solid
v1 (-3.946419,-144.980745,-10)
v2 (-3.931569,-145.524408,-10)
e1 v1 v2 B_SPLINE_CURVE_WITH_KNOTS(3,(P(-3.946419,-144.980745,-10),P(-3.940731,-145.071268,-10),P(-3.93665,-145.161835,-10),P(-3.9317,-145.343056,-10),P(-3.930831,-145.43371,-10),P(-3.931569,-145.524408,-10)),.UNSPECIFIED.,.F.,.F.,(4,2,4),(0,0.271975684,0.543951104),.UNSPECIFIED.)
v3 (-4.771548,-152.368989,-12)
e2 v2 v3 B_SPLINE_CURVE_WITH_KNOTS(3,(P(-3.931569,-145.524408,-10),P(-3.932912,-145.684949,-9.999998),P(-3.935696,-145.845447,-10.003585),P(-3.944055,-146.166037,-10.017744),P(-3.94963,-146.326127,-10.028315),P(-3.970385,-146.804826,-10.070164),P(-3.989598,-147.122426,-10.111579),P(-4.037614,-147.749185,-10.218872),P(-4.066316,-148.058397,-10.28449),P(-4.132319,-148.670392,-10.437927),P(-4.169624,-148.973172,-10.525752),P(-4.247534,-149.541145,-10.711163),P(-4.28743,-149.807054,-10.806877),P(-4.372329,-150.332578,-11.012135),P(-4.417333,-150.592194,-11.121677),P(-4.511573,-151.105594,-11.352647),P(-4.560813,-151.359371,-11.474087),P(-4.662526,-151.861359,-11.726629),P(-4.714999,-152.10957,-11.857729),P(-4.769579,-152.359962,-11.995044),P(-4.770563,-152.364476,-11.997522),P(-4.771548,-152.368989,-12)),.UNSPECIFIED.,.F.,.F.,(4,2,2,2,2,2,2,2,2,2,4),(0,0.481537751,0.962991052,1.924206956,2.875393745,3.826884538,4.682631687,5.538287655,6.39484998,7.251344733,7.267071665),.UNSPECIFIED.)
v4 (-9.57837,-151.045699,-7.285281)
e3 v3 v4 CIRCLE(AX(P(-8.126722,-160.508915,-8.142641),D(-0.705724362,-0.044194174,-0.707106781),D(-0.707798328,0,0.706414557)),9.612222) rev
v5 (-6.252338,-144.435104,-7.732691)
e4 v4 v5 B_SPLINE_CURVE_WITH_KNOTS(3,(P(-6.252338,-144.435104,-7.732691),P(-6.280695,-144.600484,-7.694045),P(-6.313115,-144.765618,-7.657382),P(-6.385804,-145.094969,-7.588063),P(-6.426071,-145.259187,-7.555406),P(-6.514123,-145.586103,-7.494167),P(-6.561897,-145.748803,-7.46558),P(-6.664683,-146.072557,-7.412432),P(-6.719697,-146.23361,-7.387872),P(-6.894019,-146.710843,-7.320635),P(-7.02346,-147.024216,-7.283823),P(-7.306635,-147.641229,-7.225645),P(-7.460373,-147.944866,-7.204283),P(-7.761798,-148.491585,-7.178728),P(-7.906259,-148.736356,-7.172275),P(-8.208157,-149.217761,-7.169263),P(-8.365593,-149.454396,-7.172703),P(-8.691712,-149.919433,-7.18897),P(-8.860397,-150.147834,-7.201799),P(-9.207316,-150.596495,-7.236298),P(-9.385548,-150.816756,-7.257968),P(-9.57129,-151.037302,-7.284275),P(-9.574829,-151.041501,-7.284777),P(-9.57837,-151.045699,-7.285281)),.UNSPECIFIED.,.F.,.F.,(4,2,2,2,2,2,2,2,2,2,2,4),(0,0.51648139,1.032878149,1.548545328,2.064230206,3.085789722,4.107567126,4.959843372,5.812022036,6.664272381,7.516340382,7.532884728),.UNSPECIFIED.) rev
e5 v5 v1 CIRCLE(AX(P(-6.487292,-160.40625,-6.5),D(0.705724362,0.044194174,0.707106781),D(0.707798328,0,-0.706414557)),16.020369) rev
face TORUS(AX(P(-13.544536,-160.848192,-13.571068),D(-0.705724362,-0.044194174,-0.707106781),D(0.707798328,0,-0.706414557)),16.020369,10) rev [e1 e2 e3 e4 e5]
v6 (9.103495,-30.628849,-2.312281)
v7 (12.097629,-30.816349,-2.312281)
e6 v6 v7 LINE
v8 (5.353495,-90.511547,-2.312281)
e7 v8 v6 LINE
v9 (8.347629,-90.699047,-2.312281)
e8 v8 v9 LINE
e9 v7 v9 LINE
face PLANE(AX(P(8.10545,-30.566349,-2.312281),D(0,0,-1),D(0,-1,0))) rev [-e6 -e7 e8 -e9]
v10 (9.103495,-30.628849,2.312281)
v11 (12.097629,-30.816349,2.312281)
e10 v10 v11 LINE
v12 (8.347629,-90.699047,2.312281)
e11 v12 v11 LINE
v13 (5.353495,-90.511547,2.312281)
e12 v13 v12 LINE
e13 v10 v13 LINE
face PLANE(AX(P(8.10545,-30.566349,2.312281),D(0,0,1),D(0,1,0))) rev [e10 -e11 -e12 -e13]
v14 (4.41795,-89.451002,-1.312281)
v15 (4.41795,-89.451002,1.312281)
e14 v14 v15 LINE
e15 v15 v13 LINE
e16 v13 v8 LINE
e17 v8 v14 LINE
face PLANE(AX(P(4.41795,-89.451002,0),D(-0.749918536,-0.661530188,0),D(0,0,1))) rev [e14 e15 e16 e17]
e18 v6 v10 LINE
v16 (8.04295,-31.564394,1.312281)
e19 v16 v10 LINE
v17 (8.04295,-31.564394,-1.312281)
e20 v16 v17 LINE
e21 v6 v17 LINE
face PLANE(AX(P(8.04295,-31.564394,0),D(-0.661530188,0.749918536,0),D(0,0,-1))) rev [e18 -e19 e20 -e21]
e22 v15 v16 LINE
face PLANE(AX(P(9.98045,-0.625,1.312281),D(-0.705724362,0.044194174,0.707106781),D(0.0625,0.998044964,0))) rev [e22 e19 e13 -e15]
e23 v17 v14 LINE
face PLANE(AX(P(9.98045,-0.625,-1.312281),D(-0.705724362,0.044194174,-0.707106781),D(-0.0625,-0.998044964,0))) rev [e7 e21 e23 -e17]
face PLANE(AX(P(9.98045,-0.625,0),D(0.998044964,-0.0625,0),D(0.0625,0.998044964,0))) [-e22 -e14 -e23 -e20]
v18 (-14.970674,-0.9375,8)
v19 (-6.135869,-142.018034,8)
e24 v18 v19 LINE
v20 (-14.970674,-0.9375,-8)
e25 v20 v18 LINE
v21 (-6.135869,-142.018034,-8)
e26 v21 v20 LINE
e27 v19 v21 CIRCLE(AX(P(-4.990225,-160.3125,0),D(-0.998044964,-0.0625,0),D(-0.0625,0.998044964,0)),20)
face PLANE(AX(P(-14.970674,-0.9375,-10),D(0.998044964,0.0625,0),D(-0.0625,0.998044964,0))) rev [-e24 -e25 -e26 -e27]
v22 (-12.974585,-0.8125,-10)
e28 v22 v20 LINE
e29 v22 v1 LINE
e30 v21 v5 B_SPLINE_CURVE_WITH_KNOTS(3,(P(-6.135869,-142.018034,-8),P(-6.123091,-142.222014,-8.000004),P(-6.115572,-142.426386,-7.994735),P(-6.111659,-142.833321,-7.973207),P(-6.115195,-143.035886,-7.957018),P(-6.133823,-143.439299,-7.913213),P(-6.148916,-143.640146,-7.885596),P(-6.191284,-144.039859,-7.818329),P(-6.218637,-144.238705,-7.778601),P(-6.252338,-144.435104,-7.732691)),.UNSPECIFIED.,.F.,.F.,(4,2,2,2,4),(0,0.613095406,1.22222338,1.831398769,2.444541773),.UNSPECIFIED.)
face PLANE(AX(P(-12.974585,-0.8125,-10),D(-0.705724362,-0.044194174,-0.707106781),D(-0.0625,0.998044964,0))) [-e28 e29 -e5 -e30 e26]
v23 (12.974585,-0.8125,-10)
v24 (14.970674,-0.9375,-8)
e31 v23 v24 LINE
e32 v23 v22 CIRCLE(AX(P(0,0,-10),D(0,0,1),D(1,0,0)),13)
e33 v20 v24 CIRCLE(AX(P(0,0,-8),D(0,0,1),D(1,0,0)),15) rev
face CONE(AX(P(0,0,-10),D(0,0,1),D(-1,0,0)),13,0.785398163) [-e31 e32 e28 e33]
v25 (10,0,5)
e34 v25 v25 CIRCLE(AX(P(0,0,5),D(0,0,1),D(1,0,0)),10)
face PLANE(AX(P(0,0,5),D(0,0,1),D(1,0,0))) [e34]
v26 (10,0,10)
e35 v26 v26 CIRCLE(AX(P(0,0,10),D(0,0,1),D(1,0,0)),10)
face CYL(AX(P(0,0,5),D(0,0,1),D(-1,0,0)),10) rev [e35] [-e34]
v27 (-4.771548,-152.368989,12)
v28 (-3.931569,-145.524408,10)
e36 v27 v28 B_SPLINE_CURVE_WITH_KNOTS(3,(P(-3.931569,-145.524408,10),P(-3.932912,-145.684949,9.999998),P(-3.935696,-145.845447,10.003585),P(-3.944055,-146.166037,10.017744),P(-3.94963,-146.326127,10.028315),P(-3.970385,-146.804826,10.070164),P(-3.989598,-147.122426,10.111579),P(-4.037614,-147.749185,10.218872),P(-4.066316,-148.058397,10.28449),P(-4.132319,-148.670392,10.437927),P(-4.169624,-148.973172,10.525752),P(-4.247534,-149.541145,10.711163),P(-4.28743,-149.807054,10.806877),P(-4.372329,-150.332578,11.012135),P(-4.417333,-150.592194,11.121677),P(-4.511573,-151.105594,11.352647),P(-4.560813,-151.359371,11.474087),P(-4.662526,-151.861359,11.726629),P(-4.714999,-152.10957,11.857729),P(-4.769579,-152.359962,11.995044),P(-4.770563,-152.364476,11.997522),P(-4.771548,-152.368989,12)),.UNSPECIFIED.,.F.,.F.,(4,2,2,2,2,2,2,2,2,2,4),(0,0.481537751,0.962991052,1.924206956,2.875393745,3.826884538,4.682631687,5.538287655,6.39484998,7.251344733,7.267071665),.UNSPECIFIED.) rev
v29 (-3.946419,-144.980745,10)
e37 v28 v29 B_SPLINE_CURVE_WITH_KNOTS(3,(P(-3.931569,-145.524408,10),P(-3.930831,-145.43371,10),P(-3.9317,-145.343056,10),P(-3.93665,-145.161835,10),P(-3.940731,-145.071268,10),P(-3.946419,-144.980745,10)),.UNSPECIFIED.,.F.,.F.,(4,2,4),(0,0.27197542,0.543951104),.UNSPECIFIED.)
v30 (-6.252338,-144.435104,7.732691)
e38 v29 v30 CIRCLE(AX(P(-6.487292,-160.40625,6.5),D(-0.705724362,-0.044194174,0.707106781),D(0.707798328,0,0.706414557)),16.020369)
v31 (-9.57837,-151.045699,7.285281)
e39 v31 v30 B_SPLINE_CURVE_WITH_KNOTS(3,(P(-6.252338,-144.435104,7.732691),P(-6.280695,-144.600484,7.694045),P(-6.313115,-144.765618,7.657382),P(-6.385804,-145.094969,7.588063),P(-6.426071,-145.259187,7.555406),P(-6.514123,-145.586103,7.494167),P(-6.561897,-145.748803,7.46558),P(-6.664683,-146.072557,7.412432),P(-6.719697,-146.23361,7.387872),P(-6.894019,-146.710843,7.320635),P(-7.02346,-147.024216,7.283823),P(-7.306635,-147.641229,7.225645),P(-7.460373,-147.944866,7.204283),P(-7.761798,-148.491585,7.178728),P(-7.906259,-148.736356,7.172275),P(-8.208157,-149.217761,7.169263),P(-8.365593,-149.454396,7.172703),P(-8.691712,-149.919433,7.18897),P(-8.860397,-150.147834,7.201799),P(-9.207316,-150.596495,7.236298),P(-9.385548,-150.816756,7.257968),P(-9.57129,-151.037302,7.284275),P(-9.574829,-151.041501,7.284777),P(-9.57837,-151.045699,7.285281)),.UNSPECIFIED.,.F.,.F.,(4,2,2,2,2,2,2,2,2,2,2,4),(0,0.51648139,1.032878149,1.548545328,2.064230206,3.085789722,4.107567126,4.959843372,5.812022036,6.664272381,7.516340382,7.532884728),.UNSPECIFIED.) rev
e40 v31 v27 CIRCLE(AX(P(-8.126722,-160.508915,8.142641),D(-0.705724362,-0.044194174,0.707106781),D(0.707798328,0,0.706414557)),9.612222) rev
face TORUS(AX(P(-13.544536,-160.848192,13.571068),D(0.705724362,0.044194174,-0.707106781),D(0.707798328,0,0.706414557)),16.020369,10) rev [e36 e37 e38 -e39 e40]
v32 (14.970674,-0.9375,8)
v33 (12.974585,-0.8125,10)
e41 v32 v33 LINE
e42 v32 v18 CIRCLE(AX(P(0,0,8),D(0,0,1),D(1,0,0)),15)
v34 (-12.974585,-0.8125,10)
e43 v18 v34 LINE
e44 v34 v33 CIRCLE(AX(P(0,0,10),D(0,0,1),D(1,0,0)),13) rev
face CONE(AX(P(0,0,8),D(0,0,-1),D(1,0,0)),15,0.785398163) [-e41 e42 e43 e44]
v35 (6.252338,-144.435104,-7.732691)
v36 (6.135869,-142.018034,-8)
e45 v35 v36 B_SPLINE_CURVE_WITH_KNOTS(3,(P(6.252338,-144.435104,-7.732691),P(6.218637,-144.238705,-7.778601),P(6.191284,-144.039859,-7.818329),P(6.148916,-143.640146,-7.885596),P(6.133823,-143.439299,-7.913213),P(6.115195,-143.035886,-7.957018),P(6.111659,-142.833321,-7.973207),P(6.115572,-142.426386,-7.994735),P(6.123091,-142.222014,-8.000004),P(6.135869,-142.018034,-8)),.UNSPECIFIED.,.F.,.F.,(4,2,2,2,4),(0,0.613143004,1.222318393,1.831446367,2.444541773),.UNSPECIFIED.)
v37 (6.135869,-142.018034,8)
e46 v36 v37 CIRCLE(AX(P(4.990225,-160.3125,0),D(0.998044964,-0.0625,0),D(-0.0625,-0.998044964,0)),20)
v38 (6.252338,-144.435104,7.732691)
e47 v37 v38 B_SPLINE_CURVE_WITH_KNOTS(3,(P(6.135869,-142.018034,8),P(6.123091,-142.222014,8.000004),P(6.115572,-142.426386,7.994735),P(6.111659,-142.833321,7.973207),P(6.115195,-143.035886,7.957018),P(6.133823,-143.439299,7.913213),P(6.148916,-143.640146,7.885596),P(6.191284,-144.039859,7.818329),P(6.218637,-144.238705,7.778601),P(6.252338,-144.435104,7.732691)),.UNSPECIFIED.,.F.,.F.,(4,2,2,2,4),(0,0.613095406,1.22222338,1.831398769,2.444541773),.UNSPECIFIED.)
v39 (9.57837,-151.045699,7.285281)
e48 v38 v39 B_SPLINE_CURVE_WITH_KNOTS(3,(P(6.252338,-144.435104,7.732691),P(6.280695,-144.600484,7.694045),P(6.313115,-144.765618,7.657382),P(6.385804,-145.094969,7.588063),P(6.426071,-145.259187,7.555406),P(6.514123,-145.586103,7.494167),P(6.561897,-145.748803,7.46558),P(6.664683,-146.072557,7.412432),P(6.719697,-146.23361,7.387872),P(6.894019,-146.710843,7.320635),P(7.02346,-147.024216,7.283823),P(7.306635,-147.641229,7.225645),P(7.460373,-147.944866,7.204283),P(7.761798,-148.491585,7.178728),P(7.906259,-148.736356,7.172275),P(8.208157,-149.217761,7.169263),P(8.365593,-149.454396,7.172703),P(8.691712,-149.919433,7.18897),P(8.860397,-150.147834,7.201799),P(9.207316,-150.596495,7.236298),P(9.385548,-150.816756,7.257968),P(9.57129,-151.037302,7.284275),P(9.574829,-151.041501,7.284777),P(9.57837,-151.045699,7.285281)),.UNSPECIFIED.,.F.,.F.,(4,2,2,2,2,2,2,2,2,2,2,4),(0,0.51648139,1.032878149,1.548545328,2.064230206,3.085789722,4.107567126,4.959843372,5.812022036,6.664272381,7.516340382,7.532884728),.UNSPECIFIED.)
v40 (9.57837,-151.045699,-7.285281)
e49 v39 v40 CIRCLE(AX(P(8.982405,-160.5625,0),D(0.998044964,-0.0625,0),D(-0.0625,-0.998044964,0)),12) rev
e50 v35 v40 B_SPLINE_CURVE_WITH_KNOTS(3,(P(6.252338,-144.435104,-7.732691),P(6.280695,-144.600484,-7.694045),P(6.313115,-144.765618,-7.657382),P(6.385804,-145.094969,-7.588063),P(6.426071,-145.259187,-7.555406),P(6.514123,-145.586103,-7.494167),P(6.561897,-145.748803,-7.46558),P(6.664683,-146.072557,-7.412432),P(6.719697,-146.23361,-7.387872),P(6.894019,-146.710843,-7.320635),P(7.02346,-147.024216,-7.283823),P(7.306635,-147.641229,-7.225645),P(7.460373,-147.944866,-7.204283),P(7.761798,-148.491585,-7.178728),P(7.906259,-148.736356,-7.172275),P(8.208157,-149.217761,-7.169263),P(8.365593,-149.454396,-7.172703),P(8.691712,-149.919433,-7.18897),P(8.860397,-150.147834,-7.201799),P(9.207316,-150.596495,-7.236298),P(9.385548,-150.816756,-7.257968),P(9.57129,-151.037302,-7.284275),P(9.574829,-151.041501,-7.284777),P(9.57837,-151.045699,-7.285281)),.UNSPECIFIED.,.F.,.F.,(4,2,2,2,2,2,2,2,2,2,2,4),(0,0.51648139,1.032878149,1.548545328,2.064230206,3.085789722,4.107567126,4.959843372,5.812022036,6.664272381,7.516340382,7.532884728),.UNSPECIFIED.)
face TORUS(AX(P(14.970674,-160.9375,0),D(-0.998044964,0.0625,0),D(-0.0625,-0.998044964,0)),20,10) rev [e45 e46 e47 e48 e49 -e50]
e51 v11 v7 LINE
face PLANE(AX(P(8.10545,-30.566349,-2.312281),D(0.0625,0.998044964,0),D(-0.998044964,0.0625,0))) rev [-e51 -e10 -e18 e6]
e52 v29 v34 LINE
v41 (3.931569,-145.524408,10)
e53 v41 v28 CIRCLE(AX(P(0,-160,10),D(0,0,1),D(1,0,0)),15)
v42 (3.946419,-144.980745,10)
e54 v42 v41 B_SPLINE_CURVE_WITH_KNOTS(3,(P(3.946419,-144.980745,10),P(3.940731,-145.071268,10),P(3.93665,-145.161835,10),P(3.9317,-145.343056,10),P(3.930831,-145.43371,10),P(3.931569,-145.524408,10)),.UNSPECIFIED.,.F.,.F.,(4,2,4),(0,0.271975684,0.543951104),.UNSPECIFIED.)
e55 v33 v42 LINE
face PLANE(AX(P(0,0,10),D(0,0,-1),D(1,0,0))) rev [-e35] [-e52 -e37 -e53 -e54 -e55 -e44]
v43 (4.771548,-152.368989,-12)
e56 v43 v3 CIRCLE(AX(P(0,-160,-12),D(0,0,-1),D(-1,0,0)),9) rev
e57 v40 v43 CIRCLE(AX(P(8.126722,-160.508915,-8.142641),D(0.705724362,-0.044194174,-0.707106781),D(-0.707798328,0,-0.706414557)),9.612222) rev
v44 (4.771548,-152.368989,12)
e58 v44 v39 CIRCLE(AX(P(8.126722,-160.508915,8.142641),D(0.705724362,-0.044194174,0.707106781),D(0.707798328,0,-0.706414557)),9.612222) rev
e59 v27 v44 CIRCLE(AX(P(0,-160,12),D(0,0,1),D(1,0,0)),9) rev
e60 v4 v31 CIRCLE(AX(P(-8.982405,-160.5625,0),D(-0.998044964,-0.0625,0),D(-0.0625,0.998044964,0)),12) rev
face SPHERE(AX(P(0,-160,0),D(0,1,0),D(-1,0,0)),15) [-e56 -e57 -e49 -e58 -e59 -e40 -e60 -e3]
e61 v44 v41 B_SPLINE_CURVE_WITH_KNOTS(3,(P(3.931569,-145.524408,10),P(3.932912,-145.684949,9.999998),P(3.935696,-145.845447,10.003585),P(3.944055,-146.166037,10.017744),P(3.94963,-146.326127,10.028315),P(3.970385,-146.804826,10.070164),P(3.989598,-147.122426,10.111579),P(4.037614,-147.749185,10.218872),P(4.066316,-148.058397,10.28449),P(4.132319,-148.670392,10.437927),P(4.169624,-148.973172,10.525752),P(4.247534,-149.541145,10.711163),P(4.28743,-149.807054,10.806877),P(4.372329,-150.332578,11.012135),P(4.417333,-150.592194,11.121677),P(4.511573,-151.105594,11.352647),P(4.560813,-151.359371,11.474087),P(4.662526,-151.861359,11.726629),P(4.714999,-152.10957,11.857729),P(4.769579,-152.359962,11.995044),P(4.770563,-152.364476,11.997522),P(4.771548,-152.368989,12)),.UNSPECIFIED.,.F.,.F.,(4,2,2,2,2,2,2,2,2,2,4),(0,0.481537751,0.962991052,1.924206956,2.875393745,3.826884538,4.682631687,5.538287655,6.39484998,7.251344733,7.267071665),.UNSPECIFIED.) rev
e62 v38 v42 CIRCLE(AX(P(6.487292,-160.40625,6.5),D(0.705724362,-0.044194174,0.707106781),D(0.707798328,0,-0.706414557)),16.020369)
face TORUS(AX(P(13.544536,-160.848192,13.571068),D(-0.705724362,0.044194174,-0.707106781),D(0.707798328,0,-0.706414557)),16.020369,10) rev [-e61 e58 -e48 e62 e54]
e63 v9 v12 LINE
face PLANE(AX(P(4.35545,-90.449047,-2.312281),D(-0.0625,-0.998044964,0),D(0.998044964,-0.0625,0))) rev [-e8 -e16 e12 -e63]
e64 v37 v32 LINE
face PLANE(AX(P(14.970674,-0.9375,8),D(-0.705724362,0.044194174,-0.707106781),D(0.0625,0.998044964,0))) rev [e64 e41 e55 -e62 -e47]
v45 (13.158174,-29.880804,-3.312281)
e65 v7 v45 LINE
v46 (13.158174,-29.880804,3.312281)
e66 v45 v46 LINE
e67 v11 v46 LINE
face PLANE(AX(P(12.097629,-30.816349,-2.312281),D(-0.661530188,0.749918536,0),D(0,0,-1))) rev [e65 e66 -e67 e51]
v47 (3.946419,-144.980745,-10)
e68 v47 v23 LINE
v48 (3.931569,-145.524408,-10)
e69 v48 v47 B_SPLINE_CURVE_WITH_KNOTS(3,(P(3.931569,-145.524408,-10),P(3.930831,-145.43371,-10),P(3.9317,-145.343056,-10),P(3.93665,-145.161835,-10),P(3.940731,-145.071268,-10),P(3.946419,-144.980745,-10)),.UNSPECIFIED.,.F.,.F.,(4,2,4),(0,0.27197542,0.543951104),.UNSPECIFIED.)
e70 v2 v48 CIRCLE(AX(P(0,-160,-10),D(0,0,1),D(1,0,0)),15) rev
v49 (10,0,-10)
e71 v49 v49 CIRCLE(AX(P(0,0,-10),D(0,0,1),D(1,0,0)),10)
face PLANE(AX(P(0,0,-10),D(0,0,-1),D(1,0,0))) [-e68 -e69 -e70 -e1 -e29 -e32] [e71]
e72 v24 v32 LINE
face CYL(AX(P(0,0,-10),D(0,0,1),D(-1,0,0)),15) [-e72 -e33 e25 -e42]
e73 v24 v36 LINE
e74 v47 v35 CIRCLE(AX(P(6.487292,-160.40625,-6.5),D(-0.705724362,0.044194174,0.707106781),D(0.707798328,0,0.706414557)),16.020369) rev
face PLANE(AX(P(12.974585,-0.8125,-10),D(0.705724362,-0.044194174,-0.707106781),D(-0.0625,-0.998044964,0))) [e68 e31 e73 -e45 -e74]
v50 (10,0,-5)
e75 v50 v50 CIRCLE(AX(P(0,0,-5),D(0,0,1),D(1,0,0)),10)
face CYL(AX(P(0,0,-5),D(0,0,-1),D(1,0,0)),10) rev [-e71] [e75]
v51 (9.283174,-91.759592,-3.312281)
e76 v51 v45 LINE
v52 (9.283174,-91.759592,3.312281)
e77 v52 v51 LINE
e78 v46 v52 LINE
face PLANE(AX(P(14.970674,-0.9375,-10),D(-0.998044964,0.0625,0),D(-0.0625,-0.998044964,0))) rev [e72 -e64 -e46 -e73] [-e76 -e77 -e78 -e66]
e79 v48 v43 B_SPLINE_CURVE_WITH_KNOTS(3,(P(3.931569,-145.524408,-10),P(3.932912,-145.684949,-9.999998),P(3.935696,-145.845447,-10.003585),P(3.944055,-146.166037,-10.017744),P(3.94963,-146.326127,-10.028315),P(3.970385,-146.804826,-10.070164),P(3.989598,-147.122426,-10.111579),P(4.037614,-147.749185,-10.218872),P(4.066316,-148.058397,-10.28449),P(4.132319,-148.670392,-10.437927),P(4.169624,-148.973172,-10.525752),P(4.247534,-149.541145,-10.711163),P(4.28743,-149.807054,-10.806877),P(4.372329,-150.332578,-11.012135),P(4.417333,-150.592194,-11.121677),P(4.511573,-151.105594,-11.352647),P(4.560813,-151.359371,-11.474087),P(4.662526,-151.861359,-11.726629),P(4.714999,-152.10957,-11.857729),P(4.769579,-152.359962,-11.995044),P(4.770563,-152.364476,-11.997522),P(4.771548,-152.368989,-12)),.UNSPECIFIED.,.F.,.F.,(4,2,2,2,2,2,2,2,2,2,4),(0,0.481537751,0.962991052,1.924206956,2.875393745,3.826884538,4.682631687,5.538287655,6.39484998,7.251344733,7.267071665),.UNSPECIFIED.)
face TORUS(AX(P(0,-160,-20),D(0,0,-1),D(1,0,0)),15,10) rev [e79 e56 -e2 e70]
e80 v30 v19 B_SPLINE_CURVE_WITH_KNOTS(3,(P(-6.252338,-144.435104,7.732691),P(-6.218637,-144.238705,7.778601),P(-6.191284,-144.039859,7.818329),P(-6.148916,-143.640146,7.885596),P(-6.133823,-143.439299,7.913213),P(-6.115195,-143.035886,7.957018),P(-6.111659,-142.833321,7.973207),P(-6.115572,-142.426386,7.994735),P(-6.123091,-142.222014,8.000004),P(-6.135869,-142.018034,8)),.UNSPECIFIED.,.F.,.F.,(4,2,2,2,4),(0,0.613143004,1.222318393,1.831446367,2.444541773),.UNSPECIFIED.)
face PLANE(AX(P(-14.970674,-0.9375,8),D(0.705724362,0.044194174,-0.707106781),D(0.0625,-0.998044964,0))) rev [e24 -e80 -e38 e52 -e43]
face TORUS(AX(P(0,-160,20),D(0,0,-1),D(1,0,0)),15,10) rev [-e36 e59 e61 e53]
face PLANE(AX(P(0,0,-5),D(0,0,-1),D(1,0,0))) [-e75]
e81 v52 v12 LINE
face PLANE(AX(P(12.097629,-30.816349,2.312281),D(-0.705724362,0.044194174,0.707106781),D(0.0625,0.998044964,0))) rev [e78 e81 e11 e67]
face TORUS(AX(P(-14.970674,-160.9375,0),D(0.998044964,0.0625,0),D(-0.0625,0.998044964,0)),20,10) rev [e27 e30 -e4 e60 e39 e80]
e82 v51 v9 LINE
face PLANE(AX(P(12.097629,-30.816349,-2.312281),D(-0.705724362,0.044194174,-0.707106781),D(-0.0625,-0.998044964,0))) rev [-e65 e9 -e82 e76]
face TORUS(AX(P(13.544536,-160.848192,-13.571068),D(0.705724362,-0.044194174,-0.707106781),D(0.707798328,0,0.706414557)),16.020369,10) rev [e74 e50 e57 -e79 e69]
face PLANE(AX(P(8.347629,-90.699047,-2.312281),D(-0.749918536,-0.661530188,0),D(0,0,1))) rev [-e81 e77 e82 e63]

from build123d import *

# Parameters (mm, degrees)
BOSS_EXTRUDE1_DEPTH = 10
SKETCH2_R           = 10
CUT_EXTRUDE1_DEPTH  = 5
CHAMFER1_SIZE       = 2
FILLET1_R           = 10
SKETCH5_W           = 4.624562382
SKETCH5_H           = 60
CUT_EXTRUDE2_DEPTH  = 5
CHAMFER2_SIZE       = 1


with BuildPart() as part:
    # Sketch1 → Boss-Extrude1 (new, symmetric)
    with BuildSketch(Plane.XY):
        with BuildLine():
            Line((-14.970674459, -0.9375), (-4.99022482, -160.3125))
            ThreePointArc((-4.99022482, -160.3125), (0, -165), (4.99022482, -160.3125))
            Line((4.99022482, -160.3125), (14.970674459, -0.9375))
            ThreePointArc((14.970674459, -0.9375), (0, 15), (-14.970674459, -0.9375))
        make_face()
    extrude(amount=BOSS_EXTRUDE1_DEPTH, both=True)

    # Sketch2 → Cut-Extrude1 (cut)
    with BuildSketch(Plane.XY.offset(10)):
        Circle(SKETCH2_R)
    cut_extrude1 = extrude(amount=-CUT_EXTRUDE1_DEPTH, mode=Mode.SUBTRACT)

    # Mirror1: Cut-Extrude1 across plane
    add(cut_extrude1.mirror(Plane.XY), mode=Mode.SUBTRACT)

    # Sketch4 → Revolve1 (revolve)
    with BuildSketch(Plane.XY):
        with BuildLine():
            Line((0, -145), (0, -175))
            ThreePointArc((0, -175), (-15, -160), (0, -145))
        make_face()
    revolve(axis=Axis((0, -145, 0), (0, -1, 0)))

    # Chamfer1
    chamfer1_edges = [part.edges().sort_by_distance(p)[0] for p in [
        (10.292949639, -75.63477518, -10),
        (10.292949639, -75.63477518, 10),
        (0, 15, 10),
        (-10.292949639, -75.63477518, -10),
        (0, 15, -10),
        (-10.292949639, -75.63477518, 10),
    ]]
    chamfer(chamfer1_edges, length=CHAMFER1_SIZE)

    # Fillet1
    # the kernel refuses this fillet: 10 mm, written as the material it adds along each edge
    with BuildSketch(Plane(origin=(-4.99022482, -160.3125, 0), x_dir=(-0.06250000000000007, 0.998044963916957, 0), z_dir=(0, 0, 1))) as fillet1_piece_1_section:
        with BuildLine():
            CenterArc((20, 10), FILLET1_R, 216.869897646, 53.130102354)
            ThreePointArc((12, 4), (13.223192267, 2.081467804), (14.142135624, 0))
            Line((14.142135624, 0), (20, 0))
        make_face()
    fillet1_piece_1 = revolve(axis=Axis((-4.99022482, -160.3125, 0), (-0.9980449639169571, -0.0625000000000001, 0)), revolution_arc=93.785115708, mode=Mode.PRIVATE)
    fillet1_piece_1 = split(fillet1_piece_1, bisect_by=Plane(origin=(-8.411420692, -145.815593995, -5.491549314), z_dir=(0.7057243619147634, 0.04419417382415924, 0.7071067811865476)), keep=Keep.TOP, mode=Mode.PRIVATE)
    add(fillet1_piece_1)
    with BuildSketch(Plane(origin=(0, -160, -10), x_dir=(0.9277589286511917, 0.3731800775872058, 0), z_dir=(0.3731800775872058, -0.9277589286511917, 0))) as fillet1_piece_2_section:
        with BuildLine():
            CenterArc((15, -10), FILLET1_R, 90, 36.869897646)
            Line((15, 0), (11.180339887, 0))
            ThreePointArc((11.180339887, 0), (10.139602038, -1.053889384), (9, -2))
        make_face()
    fillet1_piece_2 = revolve(axis=Axis((0, -160, -10), (0, 0, 1)), revolution_arc=136.176249713, mode=Mode.PRIVATE)
    fillet1_piece_2 = split(fillet1_piece_2, bisect_by=Plane(origin=(-1.711528803, -148.391440275, -12.017352281), z_dir=(0.7057243619147634, 0.04419417382415924, 0.7071067811865476)), keep=Keep.TOP, mode=Mode.PRIVATE)
    fillet1_piece_2 = split(fillet1_piece_2, bisect_by=Plane(origin=(1.711528818, -148.391440274, -12.017352265), z_dir=(-0.7057243619147635, 0.04419417382415914, 0.7071067811865476)), keep=Keep.TOP, mode=Mode.PRIVATE)
    add(fillet1_piece_2)
    with BuildSketch(Plane(origin=(4.99022482, -160.3125, 0), x_dir=(-0.00413731999969642, -0.06606770223695776, -0.9978065650737866), z_dir=(-0.06236291031711149, -0.9958558172351702, 0.0661971199951418))) as fillet1_piece_3_section:
        with BuildLine():
            CenterArc((20, 10), FILLET1_R, 216.869897646, 53.130102354)
            Line((20, 0), (14.142135624, 0))
            ThreePointArc((14.142135624, 0), (13.223192267, 2.081467804), (12, 4))
        make_face()
    fillet1_piece_3 = revolve(axis=Axis((4.99022482, -160.3125, 0), (0.9980449639169571, -0.062499999999999827, 0)), revolution_arc=187.591182269, mode=Mode.PRIVATE)
    fillet1_piece_3 = split(fillet1_piece_3, bisect_by=Plane(origin=(10.264400578, -145.931631918, -3.6349397), z_dir=(-0.7057243619147635, 0.04419417382415914, 0.7071067811865476)), keep=Keep.TOP, mode=Mode.PRIVATE)
    fillet1_piece_3 = split(fillet1_piece_3, bisect_by=Plane(origin=(10.264400578, -145.931631918, 3.6349397), z_dir=(-0.7057243619147635, 0.04419417382415914, -0.7071067811865476)), keep=Keep.TOP, mode=Mode.PRIVATE)
    add(fillet1_piece_3)
    with BuildSketch(Plane(origin=(0, -160, 10), x_dir=(0.927758928651164, 0.3731800775872745, 0), z_dir=(0.3731800775872745, -0.927758928651164, 0))) as fillet1_piece_4_section:
        with BuildLine():
            CenterArc((15, 10), FILLET1_R, 233.130102354, 36.869897646)
            Line((15, 0), (11.180339887, 0))
            ThreePointArc((11.180339887, 0), (10.139602038, 1.053889384), (9, 2))
        make_face()
    fillet1_piece_4 = revolve(axis=Axis((0, -160, 10), (0, 0, 1)), revolution_arc=136.176249714, mode=Mode.PRIVATE)
    fillet1_piece_4 = split(fillet1_piece_4, bisect_by=Plane(origin=(-1.711528803, -148.391440275, 12.017352281), z_dir=(0.7057243619147634, 0.04419417382415924, -0.7071067811865476)), keep=Keep.TOP, mode=Mode.PRIVATE)
    fillet1_piece_4 = split(fillet1_piece_4, bisect_by=Plane(origin=(1.711528818, -148.391440274, 12.017352265), z_dir=(-0.7057243619147635, 0.04419417382415914, -0.7071067811865476)), keep=Keep.TOP, mode=Mode.PRIVATE)
    add(fillet1_piece_4)
    with BuildSketch(Plane(origin=(-6.487292265, -160.40625, -6.5), x_dir=(0.6656688251347166, 0.30034358438284603, -0.6831388925861491), z_dir=(0.24256574416798043, -0.9528066993467584, -0.1825411006764494))) as fillet1_piece_5_section:
        with BuildLine():
            CenterArc((16.020369437, -10), FILLET1_R, 90, 39.852602267)
            ThreePointArc((9.612221662, -2.323044738), (10.795413975, -1.221978705), (11.853269591, 0))
            Line((11.853269591, 0), (16.020369437, 0))
        make_face()
    fillet1_piece_5 = revolve(axis=Axis((-6.487292265, -160.40625, -6.5), (0.7057243619147634, 0.04419417382415923, 0.7071067811865476)), revolution_arc=115.087423951, mode=Mode.PRIVATE)
    fillet1_piece_5 = split(fillet1_piece_5, bisect_by=Plane(origin=(-5.569597037, -151.060667617, -10.379630778), z_dir=(-0.9980449639169571, -0.0625000000000001, 0)), keep=Keep.TOP, mode=Mode.PRIVATE)
    fillet1_piece_5 = split(fillet1_piece_5, bisect_by=Plane(origin=(-5.941894243, -151.083981773, -10), z_dir=(0, 0, -1)), keep=Keep.TOP, mode=Mode.PRIVATE)
    add(fillet1_piece_5)
    with BuildSketch(Plane(origin=(-6.487292265, -160.40625, -6.5), x_dir=(0.6656688251347166, 0.30034358438284603, -0.6831388925861491), z_dir=(0.24256574416798043, -0.9528066993467584, -0.1825411006764494))) as fillet1_piece_6_section:
        with BuildLine():
            CenterArc((16.020369437, -10), FILLET1_R, 90, 39.852602267)
            ThreePointArc((9.612221662, -2.323044738), (10.795413975, -1.221978705), (11.853269591, 0))
            Line((11.853269591, 0), (16.020369437, 0))
        make_face()
    fillet1_piece_6 = revolve(axis=Axis((-6.487292265, -160.40625, -6.5), (0.7057243619147634, 0.04419417382415923, 0.7071067811865476)), revolution_arc=115.087423951, mode=Mode.PRIVATE)
    fillet1_piece_6 = split(fillet1_piece_6, bisect_by=Plane(origin=(-5.772117496, -147.826675231, -9.126693525), z_dir=(0.9980449639169571, 0.0625000000000001, 0)), keep=Keep.TOP, mode=Mode.PRIVATE)
    fillet1_piece_6 = split(fillet1_piece_6, bisect_by=Plane(origin=(-4.883304062, -147.771015575, -10), z_dir=(0, 0, 1)), keep=Keep.TOP, mode=Mode.PRIVATE)
    add(fillet1_piece_6)
    with BuildSketch(Plane(origin=(6.487292265, -160.40625, -6.5), x_dir=(-0.6656688251347197, 0.30034358438283354, -0.6831388925861517), z_dir=(-0.2425657441679716, -0.9528066993467625, -0.18254110067644053))) as fillet1_piece_7_section:
        with BuildLine():
            CenterArc((16.020369437, 10), FILLET1_R, 230.147397733, 39.852602267)
            Line((16.020369437, 0), (11.853269591, 0))
            ThreePointArc((11.853269591, 0), (10.795413975, 1.221978705), (9.612221662, 2.323044738))
        make_face()
    fillet1_piece_7 = revolve(axis=Axis((6.487292265, -160.40625, -6.5), (0.7057243619147635, -0.04419417382415914, -0.7071067811865476)), revolution_arc=115.087423951, mode=Mode.PRIVATE)
    fillet1_piece_7 = split(fillet1_piece_7, bisect_by=Plane(origin=(5.772117495, -147.826675244, -9.126693294), z_dir=(-0.9980449639169571, 0.062499999999999827, 0)), keep=Keep.TOP, mode=Mode.PRIVATE)
    fillet1_piece_7 = split(fillet1_piece_7, bisect_by=Plane(origin=(4.883304233, -147.771015598, -10), z_dir=(0, 0, 1)), keep=Keep.TOP, mode=Mode.PRIVATE)
    add(fillet1_piece_7)
    with BuildSketch(Plane(origin=(6.487292265, -160.40625, -6.5), x_dir=(-0.6656688251347197, 0.30034358438283354, -0.6831388925861517), z_dir=(-0.2425657441679716, -0.9528066993467625, -0.18254110067644053))) as fillet1_piece_8_section:
        with BuildLine():
            CenterArc((16.020369437, 10), FILLET1_R, 230.147397733, 39.852602267)
            Line((16.020369437, 0), (11.853269591, 0))
            ThreePointArc((11.853269591, 0), (10.795413975, 1.221978705), (9.612221662, 2.323044738))
        make_face()
    fillet1_piece_8 = revolve(axis=Axis((6.487292265, -160.40625, -6.5), (0.7057243619147635, -0.04419417382415914, -0.7071067811865476)), revolution_arc=115.087423951, mode=Mode.PRIVATE)
    fillet1_piece_8 = split(fillet1_piece_8, bisect_by=Plane(origin=(5.569597038, -151.060667609, -10.379630783), z_dir=(0.9980449639169571, -0.062499999999999827, 0)), keep=Keep.TOP, mode=Mode.PRIVATE)
    fillet1_piece_8 = split(fillet1_piece_8, bisect_by=Plane(origin=(5.941894234, -151.083981764, -10), z_dir=(0, 0, -1)), keep=Keep.TOP, mode=Mode.PRIVATE)
    add(fillet1_piece_8)
    with BuildSketch(Plane(origin=(-6.487292265, -160.40625, 6.5), x_dir=(0.6656688251347166, 0.3003435843828461, 0.6831388925861492), z_dir=(0.24256574416798046, -0.9528066993467585, 0.18254110067644944))) as fillet1_piece_9_section:
        with BuildLine():
            CenterArc((16.020369437, 10), FILLET1_R, 230.147397733, 39.852602267)
            ThreePointArc((9.612221662, 2.323044738), (10.795413975, 1.221978705), (11.853269591, 0))
            Line((11.853269591, 0), (16.020369437, 0))
        make_face()
    fillet1_piece_9 = revolve(axis=Axis((-6.487292265, -160.40625, 6.5), (-0.7057243619147634, -0.04419417382415923, 0.7071067811865476)), revolution_arc=115.087423951, mode=Mode.PRIVATE)
    fillet1_piece_9 = split(fillet1_piece_9, bisect_by=Plane(origin=(-5.569597037, -151.060667617, 10.379630778), z_dir=(-0.9980449639169571, -0.0625000000000001, 0)), keep=Keep.TOP, mode=Mode.PRIVATE)
    fillet1_piece_9 = split(fillet1_piece_9, bisect_by=Plane(origin=(-5.941894243, -151.083981773, 10), z_dir=(0, 0, 1)), keep=Keep.TOP, mode=Mode.PRIVATE)
    add(fillet1_piece_9)
    with BuildSketch(Plane(origin=(-6.487292265, -160.40625, 6.5), x_dir=(0.6656688251347166, 0.3003435843828461, 0.6831388925861492), z_dir=(0.24256574416798046, -0.9528066993467585, 0.18254110067644944))) as fillet1_piece_10_section:
        with BuildLine():
            CenterArc((16.020369437, 10), FILLET1_R, 230.147397733, 39.852602267)
            ThreePointArc((9.612221662, 2.323044738), (10.795413975, 1.221978705), (11.853269591, 0))
            Line((11.853269591, 0), (16.020369437, 0))
        make_face()
    fillet1_piece_10 = revolve(axis=Axis((-6.487292265, -160.40625, 6.5), (-0.7057243619147634, -0.04419417382415923, 0.7071067811865476)), revolution_arc=115.087423951, mode=Mode.PRIVATE)
    fillet1_piece_10 = split(fillet1_piece_10, bisect_by=Plane(origin=(-5.772117496, -147.826675231, 9.126693525), z_dir=(0.9980449639169571, 0.0625000000000001, 0)), keep=Keep.TOP, mode=Mode.PRIVATE)
    fillet1_piece_10 = split(fillet1_piece_10, bisect_by=Plane(origin=(-4.883304062, -147.771015575, 10), z_dir=(0, 0, -1)), keep=Keep.TOP, mode=Mode.PRIVATE)
    add(fillet1_piece_10)
    with BuildSketch(Plane(origin=(6.487292265, -160.40625, 6.5), x_dir=(-0.6656688251347211, 0.30034358438282877, 0.6831388925861526), z_dir=(-0.2425657441679683, -0.9528066993467641, 0.18254110067643708))) as fillet1_piece_11_section:
        with BuildLine():
            CenterArc((16.020369437, -10), FILLET1_R, 90, 39.852602267)
            Line((16.020369437, 0), (11.853269591, 0))
            ThreePointArc((11.853269591, 0), (10.795413975, -1.221978705), (9.612221662, -2.323044738))
        make_face()
    fillet1_piece_11 = revolve(axis=Axis((6.487292265, -160.40625, 6.5), (-0.7057243619147635, 0.04419417382415914, -0.7071067811865476)), revolution_arc=115.087423951, mode=Mode.PRIVATE)
    fillet1_piece_11 = split(fillet1_piece_11, bisect_by=Plane(origin=(5.772117495, -147.826675244, 9.126693294), z_dir=(-0.9980449639169571, 0.062499999999999827, 0)), keep=Keep.TOP, mode=Mode.PRIVATE)
    fillet1_piece_11 = split(fillet1_piece_11, bisect_by=Plane(origin=(4.883304233, -147.771015598, 10), z_dir=(0, 0, -1)), keep=Keep.TOP, mode=Mode.PRIVATE)
    add(fillet1_piece_11)
    with BuildSketch(Plane(origin=(6.487292265, -160.40625, 6.5), x_dir=(-0.6656688251347211, 0.30034358438282877, 0.6831388925861526), z_dir=(-0.2425657441679683, -0.9528066993467641, 0.18254110067643708))) as fillet1_piece_12_section:
        with BuildLine():
            CenterArc((16.020369437, -10), FILLET1_R, 90, 39.852602267)
            Line((16.020369437, 0), (11.853269591, 0))
            ThreePointArc((11.853269591, 0), (10.795413975, -1.221978705), (9.612221662, -2.323044738))
        make_face()
    fillet1_piece_12 = revolve(axis=Axis((6.487292265, -160.40625, 6.5), (-0.7057243619147635, 0.04419417382415914, -0.7071067811865476)), revolution_arc=115.087423951, mode=Mode.PRIVATE)
    fillet1_piece_12 = split(fillet1_piece_12, bisect_by=Plane(origin=(5.569597038, -151.060667609, 10.379630783), z_dir=(0.9980449639169571, -0.062499999999999827, 0)), keep=Keep.TOP, mode=Mode.PRIVATE)
    fillet1_piece_12 = split(fillet1_piece_12, bisect_by=Plane(origin=(5.941894234, -151.083981764, 10), z_dir=(0, 0, 1)), keep=Keep.TOP, mode=Mode.PRIVATE)
    add(fillet1_piece_12)
    with BuildSketch(Plane(origin=(-4.99022482, -160.3125, 0), x_dir=(0.004125917934225977, -0.06588562585262338, 0.9978186514127746), z_dir=(0.06236366571329851, -0.9958678799449294, -0.06601468694761675))) as fillet1_piece_13_section:
        with BuildLine():
            CenterArc((20, 10), FILLET1_R, 216.869897646, 53.130102354)
            ThreePointArc((12, 4), (13.223192267, 2.081467804), (14.142135624, 0))
            Line((14.142135624, 0), (20, 0))
        make_face()
    fillet1_piece_13 = revolve(axis=Axis((-4.99022482, -160.3125, 0), (-0.9980449639169571, -0.0625000000000001, 0)), revolution_arc=93.785115567, mode=Mode.PRIVATE)
    fillet1_piece_13 = split(fillet1_piece_13, bisect_by=Plane(origin=(-8.411420714, -145.815594602, 5.491549255), z_dir=(0.7057243619147634, 0.04419417382415924, -0.7071067811865476)), keep=Keep.TOP, mode=Mode.PRIVATE)
    add(fillet1_piece_13)
    with BuildSketch(Plane(origin=(-4.99022482, -160.3125, 0), x_dir=(-0.06250000000000007, 0.998044963916957, 0), z_dir=(0, 0, 1))) as fillet1_piece_14a_section:
        with BuildLine():
            CenterArc((20, 10), FILLET1_R, 216.869897646, 53.130102354)
            ThreePointArc((12, 4), (13.223192267, 2.081467804), (14.142135624, 0))
            Line((14.142135624, 0), (20, 0))
        make_face()
    fillet1_piece_14a = revolve(axis=Axis((-4.99022482, -160.3125, 0), (-0.9980449639169571, -0.0625000000000001, 0)), revolution_arc=93.785115708, mode=Mode.PRIVATE)
    fillet1_piece_14a = split(fillet1_piece_14a, bisect_by=Plane(origin=(-3.494211706, -153.151927432, -9.94062414), z_dir=(-0.7057243619147634, -0.04419417382415924, -0.7071067811865476)), keep=Keep.TOP, mode=Mode.PRIVATE)
    with BuildSketch(Plane(origin=(-6.487292265, -160.40625, -6.5), x_dir=(0.6656688251347166, 0.30034358438284603, -0.6831388925861491), z_dir=(0.24256574416798043, -0.9528066993467584, -0.1825411006764494))) as fillet1_piece_14b_section:
        with BuildLine():
            CenterArc((16.020369437, -10), FILLET1_R, 90, 39.852602267)
            ThreePointArc((9.612221662, -2.323044738), (10.795413975, -1.221978705), (11.853269591, 0))
            Line((11.853269591, 0), (16.020369437, 0))
        make_face()
    fillet1_piece_14b = revolve(axis=Axis((-6.487292265, -160.40625, -6.5), (0.7057243619147634, 0.04419417382415923, 0.7071067811865476)), revolution_arc=115.087423951, mode=Mode.PRIVATE)
    fillet1_piece_14b = split(fillet1_piece_14b, bisect_by=Plane(origin=(-5.721423334, -148.636196083, -4.719931776), z_dir=(-0.9980449639169571, -0.0625000000000001, 0)), keep=Keep.TOP, mode=Mode.PRIVATE)
    fillet1_piece_14b = split(fillet1_piece_14b, bisect_by=Plane(origin=(-9.630722553, -148.881005896, -10), z_dir=(0, 0, 1)), keep=Keep.TOP, mode=Mode.PRIVATE)
    fillet1_piece_14 = fillet1_piece_14a & fillet1_piece_14b
    add(fillet1_piece_14)
    with BuildSketch(Plane(origin=(0, -160, -10), x_dir=(0.9277589286511917, 0.3731800775872058, 0), z_dir=(0.3731800775872058, -0.9277589286511917, 0))) as fillet1_piece_15a_section:
        with BuildLine():
            CenterArc((15, -10), FILLET1_R, 90, 36.869897646)
            Line((15, 0), (11.180339887, 0))
            ThreePointArc((11.180339887, 0), (10.139602038, -1.053889384), (9, -2))
        make_face()
    fillet1_piece_15a = revolve(axis=Axis((0, -160, -10), (0, 0, 1)), revolution_arc=136.176249713, mode=Mode.PRIVATE)
    fillet1_piece_15a = split(fillet1_piece_15a, bisect_by=Plane(origin=(5.440490375, -151.409548599, -8.107049193), z_dir=(0.7057243619147635, -0.04419417382415914, -0.7071067811865476)), keep=Keep.TOP, mode=Mode.PRIVATE)
    with BuildSketch(Plane(origin=(6.487292265, -160.40625, -6.5), x_dir=(-0.6656688251347197, 0.30034358438283354, -0.6831388925861517), z_dir=(-0.2425657441679716, -0.9528066993467625, -0.18254110067644053))) as fillet1_piece_15b_section:
        with BuildLine():
            CenterArc((16.020369437, 10), FILLET1_R, 230.147397733, 39.852602267)
            Line((16.020369437, 0), (11.853269591, 0))
            ThreePointArc((11.853269591, 0), (10.795413975, 1.221978705), (9.612221662, 2.323044738))
        make_face()
    fillet1_piece_15b = revolve(axis=Axis((6.487292265, -160.40625, -6.5), (0.7057243619147635, -0.04419417382415914, -0.7071067811865476)), revolution_arc=115.087423951, mode=Mode.PRIVATE)
    fillet1_piece_15b = split(fillet1_piece_15b, bisect_by=Plane(origin=(5.496353654, -152.230270657, -13.19776536), z_dir=(-0.9980449639169571, 0.062499999999999827, 0)), keep=Keep.TOP, mode=Mode.PRIVATE)
    fillet1_piece_15b = split(fillet1_piece_15b, bisect_by=Plane(origin=(0.892229328, -151.941949208, -10), z_dir=(0, 0, -1)), keep=Keep.TOP, mode=Mode.PRIVATE)
    fillet1_piece_15 = fillet1_piece_15a & fillet1_piece_15b
    add(fillet1_piece_15)
    with BuildSketch(Plane(origin=(-6.487292265, -160.40625, -6.5), x_dir=(0.6656688251347166, 0.30034358438284603, -0.6831388925861491), z_dir=(0.24256574416798043, -0.9528066993467584, -0.1825411006764494))) as fillet1_piece_16a_section:
        with BuildLine():
            CenterArc((16.020369437, -10), FILLET1_R, 90, 39.852602267)
            ThreePointArc((9.612221662, -2.323044738), (10.795413975, -1.221978705), (11.853269591, 0))
            Line((11.853269591, 0), (16.020369437, 0))
        make_face()
    fillet1_piece_16a = revolve(axis=Axis((-6.487292265, -160.40625, -6.5), (0.7057243619147634, 0.04419417382415923, 0.7071067811865476)), revolution_arc=115.087423951, mode=Mode.PRIVATE)
    fillet1_piece_16a = split(fillet1_piece_16a, bisect_by=Plane(origin=(-5.496353661, -152.230270541, -13.197765287), z_dir=(0.9980449639169571, 0.0625000000000001, 0)), keep=Keep.TOP, mode=Mode.PRIVATE)
    fillet1_piece_16a = split(fillet1_piece_16a, bisect_by=Plane(origin=(-0.892229413, -151.941949097, -10), z_dir=(0, 0, -1)), keep=Keep.TOP, mode=Mode.PRIVATE)
    with BuildSketch(Plane(origin=(0, -160, -10), x_dir=(0.9277589286511917, 0.3731800775872058, 0), z_dir=(0.3731800775872058, -0.9277589286511917, 0))) as fillet1_piece_16b_section:
        with BuildLine():
            CenterArc((15, -10), FILLET1_R, 90, 36.869897646)
            Line((15, 0), (11.180339887, 0))
            ThreePointArc((11.180339887, 0), (10.139602038, -1.053889384), (9, -2))
        make_face()
    fillet1_piece_16b = revolve(axis=Axis((0, -160, -10), (0, 0, 1)), revolution_arc=136.176249713, mode=Mode.PRIVATE)
    fillet1_piece_16b = split(fillet1_piece_16b, bisect_by=Plane(origin=(-5.440489805, -151.409549259, -8.10704972), z_dir=(-0.7057243619147634, -0.04419417382415924, -0.7071067811865476)), keep=Keep.TOP, mode=Mode.PRIVATE)
    fillet1_piece_16 = fillet1_piece_16a & fillet1_piece_16b
    add(fillet1_piece_16)
    with BuildSketch(Plane(origin=(6.487292265, -160.40625, -6.5), x_dir=(-0.6656688251347197, 0.30034358438283354, -0.6831388925861517), z_dir=(-0.2425657441679716, -0.9528066993467625, -0.18254110067644053))) as fillet1_piece_17a_section:
        with BuildLine():
            CenterArc((16.020369437, 10), FILLET1_R, 230.147397733, 39.852602267)
            Line((16.020369437, 0), (11.853269591, 0))
            ThreePointArc((11.853269591, 0), (10.795413975, 1.221978705), (9.612221662, 2.323044738))
        make_face()
    fillet1_piece_17a = revolve(axis=Axis((6.487292265, -160.40625, -6.5), (0.7057243619147635, -0.04419417382415914, -0.7071067811865476)), revolution_arc=115.087423951, mode=Mode.PRIVATE)
    fillet1_piece_17a = split(fillet1_piece_17a, bisect_by=Plane(origin=(5.721423339, -148.636196009, -4.719932198), z_dir=(0.9980449639169571, -0.062499999999999827, 0)), keep=Keep.TOP, mode=Mode.PRIVATE)
    fillet1_piece_17a = split(fillet1_piece_17a, bisect_by=Plane(origin=(9.630722077, -148.881005792, -10), z_dir=(0, 0, 1)), keep=Keep.TOP, mode=Mode.PRIVATE)
    with BuildSketch(Plane(origin=(4.99022482, -160.3125, 0), x_dir=(-0.00413731999969642, -0.06606770223695776, -0.9978065650737866), z_dir=(-0.06236291031711149, -0.9958558172351702, 0.0661971199951418))) as fillet1_piece_17b_section:
        with BuildLine():
            CenterArc((20, 10), FILLET1_R, 216.869897646, 53.130102354)
            Line((20, 0), (14.142135624, 0))
            ThreePointArc((14.142135624, 0), (13.223192267, 2.081467804), (12, 4))
        make_face()
    fillet1_piece_17b = revolve(axis=Axis((4.99022482, -160.3125, 0), (0.9980449639169571, -0.062499999999999827, 0)), revolution_arc=187.591182269, mode=Mode.PRIVATE)
    fillet1_piece_17b = split(fillet1_piece_17b, bisect_by=Plane(origin=(3.493920459, -153.153199191, -9.940835332), z_dir=(0.7057243619147635, -0.04419417382415914, -0.7071067811865476)), keep=Keep.TOP, mode=Mode.PRIVATE)
    fillet1_piece_17 = fillet1_piece_17a & fillet1_piece_17b
    add(fillet1_piece_17)
    with BuildSketch(Plane(origin=(4.99022482, -160.3125, 0), x_dir=(-0.00413731999969642, -0.06606770223695776, -0.9978065650737866), z_dir=(-0.06236291031711149, -0.9958558172351702, 0.0661971199951418))) as fillet1_piece_18a_section:
        with BuildLine():
            CenterArc((20, 10), FILLET1_R, 216.869897646, 53.130102354)
            Line((20, 0), (14.142135624, 0))
            ThreePointArc((14.142135624, 0), (13.223192267, 2.081467804), (12, 4))
        make_face()
    fillet1_piece_18a = revolve(axis=Axis((4.99022482, -160.3125, 0), (0.9980449639169571, -0.062499999999999827, 0)), revolution_arc=187.591182269, mode=Mode.PRIVATE)
    fillet1_piece_18a = split(fillet1_piece_18a, bisect_by=Plane(origin=(3.493920905, -153.153199702, 9.940834855), z_dir=(0.7057243619147635, -0.04419417382415914, 0.7071067811865476)), keep=Keep.TOP, mode=Mode.PRIVATE)
    with BuildSketch(Plane(origin=(6.487292265, -160.40625, 6.5), x_dir=(-0.6656688251347211, 0.30034358438282877, 0.6831388925861526), z_dir=(-0.2425657441679683, -0.9528066993467641, 0.18254110067643708))) as fillet1_piece_18b_section:
        with BuildLine():
            CenterArc((16.020369437, -10), FILLET1_R, 90, 39.852602267)
            Line((16.020369437, 0), (11.853269591, 0))
            ThreePointArc((11.853269591, 0), (10.795413975, -1.221978705), (9.612221662, -2.323044738))
        make_face()
    fillet1_piece_18b = revolve(axis=Axis((6.487292265, -160.40625, 6.5), (-0.7057243619147635, 0.04419417382415914, -0.7071067811865476)), revolution_arc=115.087423951, mode=Mode.PRIVATE)
    fillet1_piece_18b = split(fillet1_piece_18b, bisect_by=Plane(origin=(5.721423339, -148.636196009, 4.719932198), z_dir=(0.9980449639169571, -0.062499999999999827, 0)), keep=Keep.TOP, mode=Mode.PRIVATE)
    fillet1_piece_18b = split(fillet1_piece_18b, bisect_by=Plane(origin=(9.630722077, -148.881005792, 10), z_dir=(0, 0, -1)), keep=Keep.TOP, mode=Mode.PRIVATE)
    fillet1_piece_18 = fillet1_piece_18a & fillet1_piece_18b
    add(fillet1_piece_18)
    with BuildSketch(Plane(origin=(6.487292265, -160.40625, 6.5), x_dir=(-0.6656688251347211, 0.30034358438282877, 0.6831388925861526), z_dir=(-0.2425657441679683, -0.9528066993467641, 0.18254110067643708))) as fillet1_piece_19a_section:
        with BuildLine():
            CenterArc((16.020369437, -10), FILLET1_R, 90, 39.852602267)
            Line((16.020369437, 0), (11.853269591, 0))
            ThreePointArc((11.853269591, 0), (10.795413975, -1.221978705), (9.612221662, -2.323044738))
        make_face()
    fillet1_piece_19a = revolve(axis=Axis((6.487292265, -160.40625, 6.5), (-0.7057243619147635, 0.04419417382415914, -0.7071067811865476)), revolution_arc=115.087423951, mode=Mode.PRIVATE)
    fillet1_piece_19a = split(fillet1_piece_19a, bisect_by=Plane(origin=(5.496353654, -152.230270657, 13.19776536), z_dir=(-0.9980449639169571, 0.062499999999999827, 0)), keep=Keep.TOP, mode=Mode.PRIVATE)
    fillet1_piece_19a = split(fillet1_piece_19a, bisect_by=Plane(origin=(0.892229328, -151.941949208, 10), z_dir=(0, 0, 1)), keep=Keep.TOP, mode=Mode.PRIVATE)
    with BuildSketch(Plane(origin=(0, -160, 10), x_dir=(0.927758928651164, 0.3731800775872745, 0), z_dir=(0.3731800775872745, -0.927758928651164, 0))) as fillet1_piece_19b_section:
        with BuildLine():
            CenterArc((15, 10), FILLET1_R, 233.130102354, 36.869897646)
            Line((15, 0), (11.180339887, 0))
            ThreePointArc((11.180339887, 0), (10.139602038, 1.053889384), (9, 2))
        make_face()
    fillet1_piece_19b = revolve(axis=Axis((0, -160, 10), (0, 0, 1)), revolution_arc=136.176249714, mode=Mode.PRIVATE)
    fillet1_piece_19b = split(fillet1_piece_19b, bisect_by=Plane(origin=(5.440490375, -151.409548599, 8.107049193), z_dir=(0.7057243619147635, -0.04419417382415914, 0.7071067811865476)), keep=Keep.TOP, mode=Mode.PRIVATE)
    fillet1_piece_19 = fillet1_piece_19a & fillet1_piece_19b
    add(fillet1_piece_19)
    with BuildSketch(Plane(origin=(-6.487292265, -160.40625, 6.5), x_dir=(0.6656688251347166, 0.3003435843828461, 0.6831388925861492), z_dir=(0.24256574416798046, -0.9528066993467585, 0.18254110067644944))) as fillet1_piece_20a_section:
        with BuildLine():
            CenterArc((16.020369437, 10), FILLET1_R, 230.147397733, 39.852602267)
            ThreePointArc((9.612221662, 2.323044738), (10.795413975, 1.221978705), (11.853269591, 0))
            Line((11.853269591, 0), (16.020369437, 0))
        make_face()
    fillet1_piece_20a = revolve(axis=Axis((-6.487292265, -160.40625, 6.5), (-0.7057243619147634, -0.04419417382415923, 0.7071067811865476)), revolution_arc=115.087423951, mode=Mode.PRIVATE)
    fillet1_piece_20a = split(fillet1_piece_20a, bisect_by=Plane(origin=(-5.496353661, -152.230270541, 13.197765287), z_dir=(0.9980449639169571, 0.0625000000000001, 0)), keep=Keep.TOP, mode=Mode.PRIVATE)
    fillet1_piece_20a = split(fillet1_piece_20a, bisect_by=Plane(origin=(-0.892229413, -151.941949097, 10), z_dir=(0, 0, 1)), keep=Keep.TOP, mode=Mode.PRIVATE)
    with BuildSketch(Plane(origin=(0, -160, 10), x_dir=(0.927758928651164, 0.3731800775872745, 0), z_dir=(0.3731800775872745, -0.927758928651164, 0))) as fillet1_piece_20b_section:
        with BuildLine():
            CenterArc((15, 10), FILLET1_R, 233.130102354, 36.869897646)
            Line((15, 0), (11.180339887, 0))
            ThreePointArc((11.180339887, 0), (10.139602038, 1.053889384), (9, 2))
        make_face()
    fillet1_piece_20b = revolve(axis=Axis((0, -160, 10), (0, 0, 1)), revolution_arc=136.176249714, mode=Mode.PRIVATE)
    fillet1_piece_20b = split(fillet1_piece_20b, bisect_by=Plane(origin=(-5.440489805, -151.409549259, 8.10704972), z_dir=(-0.7057243619147634, -0.04419417382415924, 0.7071067811865476)), keep=Keep.TOP, mode=Mode.PRIVATE)
    fillet1_piece_20 = fillet1_piece_20a & fillet1_piece_20b
    add(fillet1_piece_20)
    with BuildSketch(Plane(origin=(-4.99022482, -160.3125, 0), x_dir=(0.004125917934225977, -0.06588562585262338, 0.9978186514127746), z_dir=(0.06236366571329851, -0.9958678799449294, -0.06601468694761675))) as fillet1_piece_21a_section:
        with BuildLine():
            CenterArc((20, 10), FILLET1_R, 216.869897646, 53.130102354)
            ThreePointArc((12, 4), (13.223192267, 2.081467804), (14.142135624, 0))
            Line((14.142135624, 0), (20, 0))
        make_face()
    fillet1_piece_21a = revolve(axis=Axis((-4.99022482, -160.3125, 0), (-0.9980449639169571, -0.0625000000000001, 0)), revolution_arc=93.785115567, mode=Mode.PRIVATE)
    fillet1_piece_21a = split(fillet1_piece_21a, bisect_by=Plane(origin=(-3.494211293, -153.151926908, 9.940624585), z_dir=(-0.7057243619147634, -0.04419417382415924, 0.7071067811865476)), keep=Keep.TOP, mode=Mode.PRIVATE)
    with BuildSketch(Plane(origin=(-6.487292265, -160.40625, 6.5), x_dir=(0.6656688251347166, 0.3003435843828461, 0.6831388925861492), z_dir=(0.24256574416798046, -0.9528066993467585, 0.18254110067644944))) as fillet1_piece_21b_section:
        with BuildLine():
            CenterArc((16.020369437, 10), FILLET1_R, 230.147397733, 39.852602267)
            ThreePointArc((9.612221662, 2.323044738), (10.795413975, 1.221978705), (11.853269591, 0))
            Line((11.853269591, 0), (16.020369437, 0))
        make_face()
    fillet1_piece_21b = revolve(axis=Axis((-6.487292265, -160.40625, 6.5), (-0.7057243619147634, -0.04419417382415923, 0.7071067811865476)), revolution_arc=115.087423951, mode=Mode.PRIVATE)
    fillet1_piece_21b = split(fillet1_piece_21b, bisect_by=Plane(origin=(-5.721423334, -148.636196083, 4.719931776), z_dir=(-0.9980449639169571, -0.0625000000000001, 0)), keep=Keep.TOP, mode=Mode.PRIVATE)
    fillet1_piece_21b = split(fillet1_piece_21b, bisect_by=Plane(origin=(-9.630722553, -148.881005896, 10), z_dir=(0, 0, -1)), keep=Keep.TOP, mode=Mode.PRIVATE)
    fillet1_piece_21 = fillet1_piece_21a & fillet1_piece_21b
    add(fillet1_piece_21)

    # Sketch5 → Cut-Extrude2 (cut)
    with BuildSketch(Plane(origin=(14.970674459, -0.9375, 0), x_dir=(0, 0, -1), z_dir=(0.9980449639169572, -0.06249999999999984, 0))):
        with Locations((0, -60)):
            Rectangle(SKETCH5_W, SKETCH5_H)
    extrude(amount=-CUT_EXTRUDE2_DEPTH, mode=Mode.SUBTRACT)

    # Chamfer2
    chamfer2_edges = [part.edges().sort_by_distance(p)[0] for p in [
        (6.230449639, -60.507697835, 2.312281191),
        (8.105449639, -30.566348918, 0),
        (6.230449639, -60.507697835, -2.312281191),
        (4.355449639, -90.449046753, 0),
        (11.220674459, -60.820197835, 2.312281191),
        (9.345674459, -90.761546753, 0),
        (11.220674459, -60.820197835, -2.312281191),
        (13.095674459, -30.878848918, 0),
    ]]
    chamfer(chamfer2_edges, length=CHAMFER2_SIZE)


with BuildPart() as body_2:
    # Mirror2: mirrored copy
    add(part.part.mirror(Plane.XY))


solid = body_2.part
